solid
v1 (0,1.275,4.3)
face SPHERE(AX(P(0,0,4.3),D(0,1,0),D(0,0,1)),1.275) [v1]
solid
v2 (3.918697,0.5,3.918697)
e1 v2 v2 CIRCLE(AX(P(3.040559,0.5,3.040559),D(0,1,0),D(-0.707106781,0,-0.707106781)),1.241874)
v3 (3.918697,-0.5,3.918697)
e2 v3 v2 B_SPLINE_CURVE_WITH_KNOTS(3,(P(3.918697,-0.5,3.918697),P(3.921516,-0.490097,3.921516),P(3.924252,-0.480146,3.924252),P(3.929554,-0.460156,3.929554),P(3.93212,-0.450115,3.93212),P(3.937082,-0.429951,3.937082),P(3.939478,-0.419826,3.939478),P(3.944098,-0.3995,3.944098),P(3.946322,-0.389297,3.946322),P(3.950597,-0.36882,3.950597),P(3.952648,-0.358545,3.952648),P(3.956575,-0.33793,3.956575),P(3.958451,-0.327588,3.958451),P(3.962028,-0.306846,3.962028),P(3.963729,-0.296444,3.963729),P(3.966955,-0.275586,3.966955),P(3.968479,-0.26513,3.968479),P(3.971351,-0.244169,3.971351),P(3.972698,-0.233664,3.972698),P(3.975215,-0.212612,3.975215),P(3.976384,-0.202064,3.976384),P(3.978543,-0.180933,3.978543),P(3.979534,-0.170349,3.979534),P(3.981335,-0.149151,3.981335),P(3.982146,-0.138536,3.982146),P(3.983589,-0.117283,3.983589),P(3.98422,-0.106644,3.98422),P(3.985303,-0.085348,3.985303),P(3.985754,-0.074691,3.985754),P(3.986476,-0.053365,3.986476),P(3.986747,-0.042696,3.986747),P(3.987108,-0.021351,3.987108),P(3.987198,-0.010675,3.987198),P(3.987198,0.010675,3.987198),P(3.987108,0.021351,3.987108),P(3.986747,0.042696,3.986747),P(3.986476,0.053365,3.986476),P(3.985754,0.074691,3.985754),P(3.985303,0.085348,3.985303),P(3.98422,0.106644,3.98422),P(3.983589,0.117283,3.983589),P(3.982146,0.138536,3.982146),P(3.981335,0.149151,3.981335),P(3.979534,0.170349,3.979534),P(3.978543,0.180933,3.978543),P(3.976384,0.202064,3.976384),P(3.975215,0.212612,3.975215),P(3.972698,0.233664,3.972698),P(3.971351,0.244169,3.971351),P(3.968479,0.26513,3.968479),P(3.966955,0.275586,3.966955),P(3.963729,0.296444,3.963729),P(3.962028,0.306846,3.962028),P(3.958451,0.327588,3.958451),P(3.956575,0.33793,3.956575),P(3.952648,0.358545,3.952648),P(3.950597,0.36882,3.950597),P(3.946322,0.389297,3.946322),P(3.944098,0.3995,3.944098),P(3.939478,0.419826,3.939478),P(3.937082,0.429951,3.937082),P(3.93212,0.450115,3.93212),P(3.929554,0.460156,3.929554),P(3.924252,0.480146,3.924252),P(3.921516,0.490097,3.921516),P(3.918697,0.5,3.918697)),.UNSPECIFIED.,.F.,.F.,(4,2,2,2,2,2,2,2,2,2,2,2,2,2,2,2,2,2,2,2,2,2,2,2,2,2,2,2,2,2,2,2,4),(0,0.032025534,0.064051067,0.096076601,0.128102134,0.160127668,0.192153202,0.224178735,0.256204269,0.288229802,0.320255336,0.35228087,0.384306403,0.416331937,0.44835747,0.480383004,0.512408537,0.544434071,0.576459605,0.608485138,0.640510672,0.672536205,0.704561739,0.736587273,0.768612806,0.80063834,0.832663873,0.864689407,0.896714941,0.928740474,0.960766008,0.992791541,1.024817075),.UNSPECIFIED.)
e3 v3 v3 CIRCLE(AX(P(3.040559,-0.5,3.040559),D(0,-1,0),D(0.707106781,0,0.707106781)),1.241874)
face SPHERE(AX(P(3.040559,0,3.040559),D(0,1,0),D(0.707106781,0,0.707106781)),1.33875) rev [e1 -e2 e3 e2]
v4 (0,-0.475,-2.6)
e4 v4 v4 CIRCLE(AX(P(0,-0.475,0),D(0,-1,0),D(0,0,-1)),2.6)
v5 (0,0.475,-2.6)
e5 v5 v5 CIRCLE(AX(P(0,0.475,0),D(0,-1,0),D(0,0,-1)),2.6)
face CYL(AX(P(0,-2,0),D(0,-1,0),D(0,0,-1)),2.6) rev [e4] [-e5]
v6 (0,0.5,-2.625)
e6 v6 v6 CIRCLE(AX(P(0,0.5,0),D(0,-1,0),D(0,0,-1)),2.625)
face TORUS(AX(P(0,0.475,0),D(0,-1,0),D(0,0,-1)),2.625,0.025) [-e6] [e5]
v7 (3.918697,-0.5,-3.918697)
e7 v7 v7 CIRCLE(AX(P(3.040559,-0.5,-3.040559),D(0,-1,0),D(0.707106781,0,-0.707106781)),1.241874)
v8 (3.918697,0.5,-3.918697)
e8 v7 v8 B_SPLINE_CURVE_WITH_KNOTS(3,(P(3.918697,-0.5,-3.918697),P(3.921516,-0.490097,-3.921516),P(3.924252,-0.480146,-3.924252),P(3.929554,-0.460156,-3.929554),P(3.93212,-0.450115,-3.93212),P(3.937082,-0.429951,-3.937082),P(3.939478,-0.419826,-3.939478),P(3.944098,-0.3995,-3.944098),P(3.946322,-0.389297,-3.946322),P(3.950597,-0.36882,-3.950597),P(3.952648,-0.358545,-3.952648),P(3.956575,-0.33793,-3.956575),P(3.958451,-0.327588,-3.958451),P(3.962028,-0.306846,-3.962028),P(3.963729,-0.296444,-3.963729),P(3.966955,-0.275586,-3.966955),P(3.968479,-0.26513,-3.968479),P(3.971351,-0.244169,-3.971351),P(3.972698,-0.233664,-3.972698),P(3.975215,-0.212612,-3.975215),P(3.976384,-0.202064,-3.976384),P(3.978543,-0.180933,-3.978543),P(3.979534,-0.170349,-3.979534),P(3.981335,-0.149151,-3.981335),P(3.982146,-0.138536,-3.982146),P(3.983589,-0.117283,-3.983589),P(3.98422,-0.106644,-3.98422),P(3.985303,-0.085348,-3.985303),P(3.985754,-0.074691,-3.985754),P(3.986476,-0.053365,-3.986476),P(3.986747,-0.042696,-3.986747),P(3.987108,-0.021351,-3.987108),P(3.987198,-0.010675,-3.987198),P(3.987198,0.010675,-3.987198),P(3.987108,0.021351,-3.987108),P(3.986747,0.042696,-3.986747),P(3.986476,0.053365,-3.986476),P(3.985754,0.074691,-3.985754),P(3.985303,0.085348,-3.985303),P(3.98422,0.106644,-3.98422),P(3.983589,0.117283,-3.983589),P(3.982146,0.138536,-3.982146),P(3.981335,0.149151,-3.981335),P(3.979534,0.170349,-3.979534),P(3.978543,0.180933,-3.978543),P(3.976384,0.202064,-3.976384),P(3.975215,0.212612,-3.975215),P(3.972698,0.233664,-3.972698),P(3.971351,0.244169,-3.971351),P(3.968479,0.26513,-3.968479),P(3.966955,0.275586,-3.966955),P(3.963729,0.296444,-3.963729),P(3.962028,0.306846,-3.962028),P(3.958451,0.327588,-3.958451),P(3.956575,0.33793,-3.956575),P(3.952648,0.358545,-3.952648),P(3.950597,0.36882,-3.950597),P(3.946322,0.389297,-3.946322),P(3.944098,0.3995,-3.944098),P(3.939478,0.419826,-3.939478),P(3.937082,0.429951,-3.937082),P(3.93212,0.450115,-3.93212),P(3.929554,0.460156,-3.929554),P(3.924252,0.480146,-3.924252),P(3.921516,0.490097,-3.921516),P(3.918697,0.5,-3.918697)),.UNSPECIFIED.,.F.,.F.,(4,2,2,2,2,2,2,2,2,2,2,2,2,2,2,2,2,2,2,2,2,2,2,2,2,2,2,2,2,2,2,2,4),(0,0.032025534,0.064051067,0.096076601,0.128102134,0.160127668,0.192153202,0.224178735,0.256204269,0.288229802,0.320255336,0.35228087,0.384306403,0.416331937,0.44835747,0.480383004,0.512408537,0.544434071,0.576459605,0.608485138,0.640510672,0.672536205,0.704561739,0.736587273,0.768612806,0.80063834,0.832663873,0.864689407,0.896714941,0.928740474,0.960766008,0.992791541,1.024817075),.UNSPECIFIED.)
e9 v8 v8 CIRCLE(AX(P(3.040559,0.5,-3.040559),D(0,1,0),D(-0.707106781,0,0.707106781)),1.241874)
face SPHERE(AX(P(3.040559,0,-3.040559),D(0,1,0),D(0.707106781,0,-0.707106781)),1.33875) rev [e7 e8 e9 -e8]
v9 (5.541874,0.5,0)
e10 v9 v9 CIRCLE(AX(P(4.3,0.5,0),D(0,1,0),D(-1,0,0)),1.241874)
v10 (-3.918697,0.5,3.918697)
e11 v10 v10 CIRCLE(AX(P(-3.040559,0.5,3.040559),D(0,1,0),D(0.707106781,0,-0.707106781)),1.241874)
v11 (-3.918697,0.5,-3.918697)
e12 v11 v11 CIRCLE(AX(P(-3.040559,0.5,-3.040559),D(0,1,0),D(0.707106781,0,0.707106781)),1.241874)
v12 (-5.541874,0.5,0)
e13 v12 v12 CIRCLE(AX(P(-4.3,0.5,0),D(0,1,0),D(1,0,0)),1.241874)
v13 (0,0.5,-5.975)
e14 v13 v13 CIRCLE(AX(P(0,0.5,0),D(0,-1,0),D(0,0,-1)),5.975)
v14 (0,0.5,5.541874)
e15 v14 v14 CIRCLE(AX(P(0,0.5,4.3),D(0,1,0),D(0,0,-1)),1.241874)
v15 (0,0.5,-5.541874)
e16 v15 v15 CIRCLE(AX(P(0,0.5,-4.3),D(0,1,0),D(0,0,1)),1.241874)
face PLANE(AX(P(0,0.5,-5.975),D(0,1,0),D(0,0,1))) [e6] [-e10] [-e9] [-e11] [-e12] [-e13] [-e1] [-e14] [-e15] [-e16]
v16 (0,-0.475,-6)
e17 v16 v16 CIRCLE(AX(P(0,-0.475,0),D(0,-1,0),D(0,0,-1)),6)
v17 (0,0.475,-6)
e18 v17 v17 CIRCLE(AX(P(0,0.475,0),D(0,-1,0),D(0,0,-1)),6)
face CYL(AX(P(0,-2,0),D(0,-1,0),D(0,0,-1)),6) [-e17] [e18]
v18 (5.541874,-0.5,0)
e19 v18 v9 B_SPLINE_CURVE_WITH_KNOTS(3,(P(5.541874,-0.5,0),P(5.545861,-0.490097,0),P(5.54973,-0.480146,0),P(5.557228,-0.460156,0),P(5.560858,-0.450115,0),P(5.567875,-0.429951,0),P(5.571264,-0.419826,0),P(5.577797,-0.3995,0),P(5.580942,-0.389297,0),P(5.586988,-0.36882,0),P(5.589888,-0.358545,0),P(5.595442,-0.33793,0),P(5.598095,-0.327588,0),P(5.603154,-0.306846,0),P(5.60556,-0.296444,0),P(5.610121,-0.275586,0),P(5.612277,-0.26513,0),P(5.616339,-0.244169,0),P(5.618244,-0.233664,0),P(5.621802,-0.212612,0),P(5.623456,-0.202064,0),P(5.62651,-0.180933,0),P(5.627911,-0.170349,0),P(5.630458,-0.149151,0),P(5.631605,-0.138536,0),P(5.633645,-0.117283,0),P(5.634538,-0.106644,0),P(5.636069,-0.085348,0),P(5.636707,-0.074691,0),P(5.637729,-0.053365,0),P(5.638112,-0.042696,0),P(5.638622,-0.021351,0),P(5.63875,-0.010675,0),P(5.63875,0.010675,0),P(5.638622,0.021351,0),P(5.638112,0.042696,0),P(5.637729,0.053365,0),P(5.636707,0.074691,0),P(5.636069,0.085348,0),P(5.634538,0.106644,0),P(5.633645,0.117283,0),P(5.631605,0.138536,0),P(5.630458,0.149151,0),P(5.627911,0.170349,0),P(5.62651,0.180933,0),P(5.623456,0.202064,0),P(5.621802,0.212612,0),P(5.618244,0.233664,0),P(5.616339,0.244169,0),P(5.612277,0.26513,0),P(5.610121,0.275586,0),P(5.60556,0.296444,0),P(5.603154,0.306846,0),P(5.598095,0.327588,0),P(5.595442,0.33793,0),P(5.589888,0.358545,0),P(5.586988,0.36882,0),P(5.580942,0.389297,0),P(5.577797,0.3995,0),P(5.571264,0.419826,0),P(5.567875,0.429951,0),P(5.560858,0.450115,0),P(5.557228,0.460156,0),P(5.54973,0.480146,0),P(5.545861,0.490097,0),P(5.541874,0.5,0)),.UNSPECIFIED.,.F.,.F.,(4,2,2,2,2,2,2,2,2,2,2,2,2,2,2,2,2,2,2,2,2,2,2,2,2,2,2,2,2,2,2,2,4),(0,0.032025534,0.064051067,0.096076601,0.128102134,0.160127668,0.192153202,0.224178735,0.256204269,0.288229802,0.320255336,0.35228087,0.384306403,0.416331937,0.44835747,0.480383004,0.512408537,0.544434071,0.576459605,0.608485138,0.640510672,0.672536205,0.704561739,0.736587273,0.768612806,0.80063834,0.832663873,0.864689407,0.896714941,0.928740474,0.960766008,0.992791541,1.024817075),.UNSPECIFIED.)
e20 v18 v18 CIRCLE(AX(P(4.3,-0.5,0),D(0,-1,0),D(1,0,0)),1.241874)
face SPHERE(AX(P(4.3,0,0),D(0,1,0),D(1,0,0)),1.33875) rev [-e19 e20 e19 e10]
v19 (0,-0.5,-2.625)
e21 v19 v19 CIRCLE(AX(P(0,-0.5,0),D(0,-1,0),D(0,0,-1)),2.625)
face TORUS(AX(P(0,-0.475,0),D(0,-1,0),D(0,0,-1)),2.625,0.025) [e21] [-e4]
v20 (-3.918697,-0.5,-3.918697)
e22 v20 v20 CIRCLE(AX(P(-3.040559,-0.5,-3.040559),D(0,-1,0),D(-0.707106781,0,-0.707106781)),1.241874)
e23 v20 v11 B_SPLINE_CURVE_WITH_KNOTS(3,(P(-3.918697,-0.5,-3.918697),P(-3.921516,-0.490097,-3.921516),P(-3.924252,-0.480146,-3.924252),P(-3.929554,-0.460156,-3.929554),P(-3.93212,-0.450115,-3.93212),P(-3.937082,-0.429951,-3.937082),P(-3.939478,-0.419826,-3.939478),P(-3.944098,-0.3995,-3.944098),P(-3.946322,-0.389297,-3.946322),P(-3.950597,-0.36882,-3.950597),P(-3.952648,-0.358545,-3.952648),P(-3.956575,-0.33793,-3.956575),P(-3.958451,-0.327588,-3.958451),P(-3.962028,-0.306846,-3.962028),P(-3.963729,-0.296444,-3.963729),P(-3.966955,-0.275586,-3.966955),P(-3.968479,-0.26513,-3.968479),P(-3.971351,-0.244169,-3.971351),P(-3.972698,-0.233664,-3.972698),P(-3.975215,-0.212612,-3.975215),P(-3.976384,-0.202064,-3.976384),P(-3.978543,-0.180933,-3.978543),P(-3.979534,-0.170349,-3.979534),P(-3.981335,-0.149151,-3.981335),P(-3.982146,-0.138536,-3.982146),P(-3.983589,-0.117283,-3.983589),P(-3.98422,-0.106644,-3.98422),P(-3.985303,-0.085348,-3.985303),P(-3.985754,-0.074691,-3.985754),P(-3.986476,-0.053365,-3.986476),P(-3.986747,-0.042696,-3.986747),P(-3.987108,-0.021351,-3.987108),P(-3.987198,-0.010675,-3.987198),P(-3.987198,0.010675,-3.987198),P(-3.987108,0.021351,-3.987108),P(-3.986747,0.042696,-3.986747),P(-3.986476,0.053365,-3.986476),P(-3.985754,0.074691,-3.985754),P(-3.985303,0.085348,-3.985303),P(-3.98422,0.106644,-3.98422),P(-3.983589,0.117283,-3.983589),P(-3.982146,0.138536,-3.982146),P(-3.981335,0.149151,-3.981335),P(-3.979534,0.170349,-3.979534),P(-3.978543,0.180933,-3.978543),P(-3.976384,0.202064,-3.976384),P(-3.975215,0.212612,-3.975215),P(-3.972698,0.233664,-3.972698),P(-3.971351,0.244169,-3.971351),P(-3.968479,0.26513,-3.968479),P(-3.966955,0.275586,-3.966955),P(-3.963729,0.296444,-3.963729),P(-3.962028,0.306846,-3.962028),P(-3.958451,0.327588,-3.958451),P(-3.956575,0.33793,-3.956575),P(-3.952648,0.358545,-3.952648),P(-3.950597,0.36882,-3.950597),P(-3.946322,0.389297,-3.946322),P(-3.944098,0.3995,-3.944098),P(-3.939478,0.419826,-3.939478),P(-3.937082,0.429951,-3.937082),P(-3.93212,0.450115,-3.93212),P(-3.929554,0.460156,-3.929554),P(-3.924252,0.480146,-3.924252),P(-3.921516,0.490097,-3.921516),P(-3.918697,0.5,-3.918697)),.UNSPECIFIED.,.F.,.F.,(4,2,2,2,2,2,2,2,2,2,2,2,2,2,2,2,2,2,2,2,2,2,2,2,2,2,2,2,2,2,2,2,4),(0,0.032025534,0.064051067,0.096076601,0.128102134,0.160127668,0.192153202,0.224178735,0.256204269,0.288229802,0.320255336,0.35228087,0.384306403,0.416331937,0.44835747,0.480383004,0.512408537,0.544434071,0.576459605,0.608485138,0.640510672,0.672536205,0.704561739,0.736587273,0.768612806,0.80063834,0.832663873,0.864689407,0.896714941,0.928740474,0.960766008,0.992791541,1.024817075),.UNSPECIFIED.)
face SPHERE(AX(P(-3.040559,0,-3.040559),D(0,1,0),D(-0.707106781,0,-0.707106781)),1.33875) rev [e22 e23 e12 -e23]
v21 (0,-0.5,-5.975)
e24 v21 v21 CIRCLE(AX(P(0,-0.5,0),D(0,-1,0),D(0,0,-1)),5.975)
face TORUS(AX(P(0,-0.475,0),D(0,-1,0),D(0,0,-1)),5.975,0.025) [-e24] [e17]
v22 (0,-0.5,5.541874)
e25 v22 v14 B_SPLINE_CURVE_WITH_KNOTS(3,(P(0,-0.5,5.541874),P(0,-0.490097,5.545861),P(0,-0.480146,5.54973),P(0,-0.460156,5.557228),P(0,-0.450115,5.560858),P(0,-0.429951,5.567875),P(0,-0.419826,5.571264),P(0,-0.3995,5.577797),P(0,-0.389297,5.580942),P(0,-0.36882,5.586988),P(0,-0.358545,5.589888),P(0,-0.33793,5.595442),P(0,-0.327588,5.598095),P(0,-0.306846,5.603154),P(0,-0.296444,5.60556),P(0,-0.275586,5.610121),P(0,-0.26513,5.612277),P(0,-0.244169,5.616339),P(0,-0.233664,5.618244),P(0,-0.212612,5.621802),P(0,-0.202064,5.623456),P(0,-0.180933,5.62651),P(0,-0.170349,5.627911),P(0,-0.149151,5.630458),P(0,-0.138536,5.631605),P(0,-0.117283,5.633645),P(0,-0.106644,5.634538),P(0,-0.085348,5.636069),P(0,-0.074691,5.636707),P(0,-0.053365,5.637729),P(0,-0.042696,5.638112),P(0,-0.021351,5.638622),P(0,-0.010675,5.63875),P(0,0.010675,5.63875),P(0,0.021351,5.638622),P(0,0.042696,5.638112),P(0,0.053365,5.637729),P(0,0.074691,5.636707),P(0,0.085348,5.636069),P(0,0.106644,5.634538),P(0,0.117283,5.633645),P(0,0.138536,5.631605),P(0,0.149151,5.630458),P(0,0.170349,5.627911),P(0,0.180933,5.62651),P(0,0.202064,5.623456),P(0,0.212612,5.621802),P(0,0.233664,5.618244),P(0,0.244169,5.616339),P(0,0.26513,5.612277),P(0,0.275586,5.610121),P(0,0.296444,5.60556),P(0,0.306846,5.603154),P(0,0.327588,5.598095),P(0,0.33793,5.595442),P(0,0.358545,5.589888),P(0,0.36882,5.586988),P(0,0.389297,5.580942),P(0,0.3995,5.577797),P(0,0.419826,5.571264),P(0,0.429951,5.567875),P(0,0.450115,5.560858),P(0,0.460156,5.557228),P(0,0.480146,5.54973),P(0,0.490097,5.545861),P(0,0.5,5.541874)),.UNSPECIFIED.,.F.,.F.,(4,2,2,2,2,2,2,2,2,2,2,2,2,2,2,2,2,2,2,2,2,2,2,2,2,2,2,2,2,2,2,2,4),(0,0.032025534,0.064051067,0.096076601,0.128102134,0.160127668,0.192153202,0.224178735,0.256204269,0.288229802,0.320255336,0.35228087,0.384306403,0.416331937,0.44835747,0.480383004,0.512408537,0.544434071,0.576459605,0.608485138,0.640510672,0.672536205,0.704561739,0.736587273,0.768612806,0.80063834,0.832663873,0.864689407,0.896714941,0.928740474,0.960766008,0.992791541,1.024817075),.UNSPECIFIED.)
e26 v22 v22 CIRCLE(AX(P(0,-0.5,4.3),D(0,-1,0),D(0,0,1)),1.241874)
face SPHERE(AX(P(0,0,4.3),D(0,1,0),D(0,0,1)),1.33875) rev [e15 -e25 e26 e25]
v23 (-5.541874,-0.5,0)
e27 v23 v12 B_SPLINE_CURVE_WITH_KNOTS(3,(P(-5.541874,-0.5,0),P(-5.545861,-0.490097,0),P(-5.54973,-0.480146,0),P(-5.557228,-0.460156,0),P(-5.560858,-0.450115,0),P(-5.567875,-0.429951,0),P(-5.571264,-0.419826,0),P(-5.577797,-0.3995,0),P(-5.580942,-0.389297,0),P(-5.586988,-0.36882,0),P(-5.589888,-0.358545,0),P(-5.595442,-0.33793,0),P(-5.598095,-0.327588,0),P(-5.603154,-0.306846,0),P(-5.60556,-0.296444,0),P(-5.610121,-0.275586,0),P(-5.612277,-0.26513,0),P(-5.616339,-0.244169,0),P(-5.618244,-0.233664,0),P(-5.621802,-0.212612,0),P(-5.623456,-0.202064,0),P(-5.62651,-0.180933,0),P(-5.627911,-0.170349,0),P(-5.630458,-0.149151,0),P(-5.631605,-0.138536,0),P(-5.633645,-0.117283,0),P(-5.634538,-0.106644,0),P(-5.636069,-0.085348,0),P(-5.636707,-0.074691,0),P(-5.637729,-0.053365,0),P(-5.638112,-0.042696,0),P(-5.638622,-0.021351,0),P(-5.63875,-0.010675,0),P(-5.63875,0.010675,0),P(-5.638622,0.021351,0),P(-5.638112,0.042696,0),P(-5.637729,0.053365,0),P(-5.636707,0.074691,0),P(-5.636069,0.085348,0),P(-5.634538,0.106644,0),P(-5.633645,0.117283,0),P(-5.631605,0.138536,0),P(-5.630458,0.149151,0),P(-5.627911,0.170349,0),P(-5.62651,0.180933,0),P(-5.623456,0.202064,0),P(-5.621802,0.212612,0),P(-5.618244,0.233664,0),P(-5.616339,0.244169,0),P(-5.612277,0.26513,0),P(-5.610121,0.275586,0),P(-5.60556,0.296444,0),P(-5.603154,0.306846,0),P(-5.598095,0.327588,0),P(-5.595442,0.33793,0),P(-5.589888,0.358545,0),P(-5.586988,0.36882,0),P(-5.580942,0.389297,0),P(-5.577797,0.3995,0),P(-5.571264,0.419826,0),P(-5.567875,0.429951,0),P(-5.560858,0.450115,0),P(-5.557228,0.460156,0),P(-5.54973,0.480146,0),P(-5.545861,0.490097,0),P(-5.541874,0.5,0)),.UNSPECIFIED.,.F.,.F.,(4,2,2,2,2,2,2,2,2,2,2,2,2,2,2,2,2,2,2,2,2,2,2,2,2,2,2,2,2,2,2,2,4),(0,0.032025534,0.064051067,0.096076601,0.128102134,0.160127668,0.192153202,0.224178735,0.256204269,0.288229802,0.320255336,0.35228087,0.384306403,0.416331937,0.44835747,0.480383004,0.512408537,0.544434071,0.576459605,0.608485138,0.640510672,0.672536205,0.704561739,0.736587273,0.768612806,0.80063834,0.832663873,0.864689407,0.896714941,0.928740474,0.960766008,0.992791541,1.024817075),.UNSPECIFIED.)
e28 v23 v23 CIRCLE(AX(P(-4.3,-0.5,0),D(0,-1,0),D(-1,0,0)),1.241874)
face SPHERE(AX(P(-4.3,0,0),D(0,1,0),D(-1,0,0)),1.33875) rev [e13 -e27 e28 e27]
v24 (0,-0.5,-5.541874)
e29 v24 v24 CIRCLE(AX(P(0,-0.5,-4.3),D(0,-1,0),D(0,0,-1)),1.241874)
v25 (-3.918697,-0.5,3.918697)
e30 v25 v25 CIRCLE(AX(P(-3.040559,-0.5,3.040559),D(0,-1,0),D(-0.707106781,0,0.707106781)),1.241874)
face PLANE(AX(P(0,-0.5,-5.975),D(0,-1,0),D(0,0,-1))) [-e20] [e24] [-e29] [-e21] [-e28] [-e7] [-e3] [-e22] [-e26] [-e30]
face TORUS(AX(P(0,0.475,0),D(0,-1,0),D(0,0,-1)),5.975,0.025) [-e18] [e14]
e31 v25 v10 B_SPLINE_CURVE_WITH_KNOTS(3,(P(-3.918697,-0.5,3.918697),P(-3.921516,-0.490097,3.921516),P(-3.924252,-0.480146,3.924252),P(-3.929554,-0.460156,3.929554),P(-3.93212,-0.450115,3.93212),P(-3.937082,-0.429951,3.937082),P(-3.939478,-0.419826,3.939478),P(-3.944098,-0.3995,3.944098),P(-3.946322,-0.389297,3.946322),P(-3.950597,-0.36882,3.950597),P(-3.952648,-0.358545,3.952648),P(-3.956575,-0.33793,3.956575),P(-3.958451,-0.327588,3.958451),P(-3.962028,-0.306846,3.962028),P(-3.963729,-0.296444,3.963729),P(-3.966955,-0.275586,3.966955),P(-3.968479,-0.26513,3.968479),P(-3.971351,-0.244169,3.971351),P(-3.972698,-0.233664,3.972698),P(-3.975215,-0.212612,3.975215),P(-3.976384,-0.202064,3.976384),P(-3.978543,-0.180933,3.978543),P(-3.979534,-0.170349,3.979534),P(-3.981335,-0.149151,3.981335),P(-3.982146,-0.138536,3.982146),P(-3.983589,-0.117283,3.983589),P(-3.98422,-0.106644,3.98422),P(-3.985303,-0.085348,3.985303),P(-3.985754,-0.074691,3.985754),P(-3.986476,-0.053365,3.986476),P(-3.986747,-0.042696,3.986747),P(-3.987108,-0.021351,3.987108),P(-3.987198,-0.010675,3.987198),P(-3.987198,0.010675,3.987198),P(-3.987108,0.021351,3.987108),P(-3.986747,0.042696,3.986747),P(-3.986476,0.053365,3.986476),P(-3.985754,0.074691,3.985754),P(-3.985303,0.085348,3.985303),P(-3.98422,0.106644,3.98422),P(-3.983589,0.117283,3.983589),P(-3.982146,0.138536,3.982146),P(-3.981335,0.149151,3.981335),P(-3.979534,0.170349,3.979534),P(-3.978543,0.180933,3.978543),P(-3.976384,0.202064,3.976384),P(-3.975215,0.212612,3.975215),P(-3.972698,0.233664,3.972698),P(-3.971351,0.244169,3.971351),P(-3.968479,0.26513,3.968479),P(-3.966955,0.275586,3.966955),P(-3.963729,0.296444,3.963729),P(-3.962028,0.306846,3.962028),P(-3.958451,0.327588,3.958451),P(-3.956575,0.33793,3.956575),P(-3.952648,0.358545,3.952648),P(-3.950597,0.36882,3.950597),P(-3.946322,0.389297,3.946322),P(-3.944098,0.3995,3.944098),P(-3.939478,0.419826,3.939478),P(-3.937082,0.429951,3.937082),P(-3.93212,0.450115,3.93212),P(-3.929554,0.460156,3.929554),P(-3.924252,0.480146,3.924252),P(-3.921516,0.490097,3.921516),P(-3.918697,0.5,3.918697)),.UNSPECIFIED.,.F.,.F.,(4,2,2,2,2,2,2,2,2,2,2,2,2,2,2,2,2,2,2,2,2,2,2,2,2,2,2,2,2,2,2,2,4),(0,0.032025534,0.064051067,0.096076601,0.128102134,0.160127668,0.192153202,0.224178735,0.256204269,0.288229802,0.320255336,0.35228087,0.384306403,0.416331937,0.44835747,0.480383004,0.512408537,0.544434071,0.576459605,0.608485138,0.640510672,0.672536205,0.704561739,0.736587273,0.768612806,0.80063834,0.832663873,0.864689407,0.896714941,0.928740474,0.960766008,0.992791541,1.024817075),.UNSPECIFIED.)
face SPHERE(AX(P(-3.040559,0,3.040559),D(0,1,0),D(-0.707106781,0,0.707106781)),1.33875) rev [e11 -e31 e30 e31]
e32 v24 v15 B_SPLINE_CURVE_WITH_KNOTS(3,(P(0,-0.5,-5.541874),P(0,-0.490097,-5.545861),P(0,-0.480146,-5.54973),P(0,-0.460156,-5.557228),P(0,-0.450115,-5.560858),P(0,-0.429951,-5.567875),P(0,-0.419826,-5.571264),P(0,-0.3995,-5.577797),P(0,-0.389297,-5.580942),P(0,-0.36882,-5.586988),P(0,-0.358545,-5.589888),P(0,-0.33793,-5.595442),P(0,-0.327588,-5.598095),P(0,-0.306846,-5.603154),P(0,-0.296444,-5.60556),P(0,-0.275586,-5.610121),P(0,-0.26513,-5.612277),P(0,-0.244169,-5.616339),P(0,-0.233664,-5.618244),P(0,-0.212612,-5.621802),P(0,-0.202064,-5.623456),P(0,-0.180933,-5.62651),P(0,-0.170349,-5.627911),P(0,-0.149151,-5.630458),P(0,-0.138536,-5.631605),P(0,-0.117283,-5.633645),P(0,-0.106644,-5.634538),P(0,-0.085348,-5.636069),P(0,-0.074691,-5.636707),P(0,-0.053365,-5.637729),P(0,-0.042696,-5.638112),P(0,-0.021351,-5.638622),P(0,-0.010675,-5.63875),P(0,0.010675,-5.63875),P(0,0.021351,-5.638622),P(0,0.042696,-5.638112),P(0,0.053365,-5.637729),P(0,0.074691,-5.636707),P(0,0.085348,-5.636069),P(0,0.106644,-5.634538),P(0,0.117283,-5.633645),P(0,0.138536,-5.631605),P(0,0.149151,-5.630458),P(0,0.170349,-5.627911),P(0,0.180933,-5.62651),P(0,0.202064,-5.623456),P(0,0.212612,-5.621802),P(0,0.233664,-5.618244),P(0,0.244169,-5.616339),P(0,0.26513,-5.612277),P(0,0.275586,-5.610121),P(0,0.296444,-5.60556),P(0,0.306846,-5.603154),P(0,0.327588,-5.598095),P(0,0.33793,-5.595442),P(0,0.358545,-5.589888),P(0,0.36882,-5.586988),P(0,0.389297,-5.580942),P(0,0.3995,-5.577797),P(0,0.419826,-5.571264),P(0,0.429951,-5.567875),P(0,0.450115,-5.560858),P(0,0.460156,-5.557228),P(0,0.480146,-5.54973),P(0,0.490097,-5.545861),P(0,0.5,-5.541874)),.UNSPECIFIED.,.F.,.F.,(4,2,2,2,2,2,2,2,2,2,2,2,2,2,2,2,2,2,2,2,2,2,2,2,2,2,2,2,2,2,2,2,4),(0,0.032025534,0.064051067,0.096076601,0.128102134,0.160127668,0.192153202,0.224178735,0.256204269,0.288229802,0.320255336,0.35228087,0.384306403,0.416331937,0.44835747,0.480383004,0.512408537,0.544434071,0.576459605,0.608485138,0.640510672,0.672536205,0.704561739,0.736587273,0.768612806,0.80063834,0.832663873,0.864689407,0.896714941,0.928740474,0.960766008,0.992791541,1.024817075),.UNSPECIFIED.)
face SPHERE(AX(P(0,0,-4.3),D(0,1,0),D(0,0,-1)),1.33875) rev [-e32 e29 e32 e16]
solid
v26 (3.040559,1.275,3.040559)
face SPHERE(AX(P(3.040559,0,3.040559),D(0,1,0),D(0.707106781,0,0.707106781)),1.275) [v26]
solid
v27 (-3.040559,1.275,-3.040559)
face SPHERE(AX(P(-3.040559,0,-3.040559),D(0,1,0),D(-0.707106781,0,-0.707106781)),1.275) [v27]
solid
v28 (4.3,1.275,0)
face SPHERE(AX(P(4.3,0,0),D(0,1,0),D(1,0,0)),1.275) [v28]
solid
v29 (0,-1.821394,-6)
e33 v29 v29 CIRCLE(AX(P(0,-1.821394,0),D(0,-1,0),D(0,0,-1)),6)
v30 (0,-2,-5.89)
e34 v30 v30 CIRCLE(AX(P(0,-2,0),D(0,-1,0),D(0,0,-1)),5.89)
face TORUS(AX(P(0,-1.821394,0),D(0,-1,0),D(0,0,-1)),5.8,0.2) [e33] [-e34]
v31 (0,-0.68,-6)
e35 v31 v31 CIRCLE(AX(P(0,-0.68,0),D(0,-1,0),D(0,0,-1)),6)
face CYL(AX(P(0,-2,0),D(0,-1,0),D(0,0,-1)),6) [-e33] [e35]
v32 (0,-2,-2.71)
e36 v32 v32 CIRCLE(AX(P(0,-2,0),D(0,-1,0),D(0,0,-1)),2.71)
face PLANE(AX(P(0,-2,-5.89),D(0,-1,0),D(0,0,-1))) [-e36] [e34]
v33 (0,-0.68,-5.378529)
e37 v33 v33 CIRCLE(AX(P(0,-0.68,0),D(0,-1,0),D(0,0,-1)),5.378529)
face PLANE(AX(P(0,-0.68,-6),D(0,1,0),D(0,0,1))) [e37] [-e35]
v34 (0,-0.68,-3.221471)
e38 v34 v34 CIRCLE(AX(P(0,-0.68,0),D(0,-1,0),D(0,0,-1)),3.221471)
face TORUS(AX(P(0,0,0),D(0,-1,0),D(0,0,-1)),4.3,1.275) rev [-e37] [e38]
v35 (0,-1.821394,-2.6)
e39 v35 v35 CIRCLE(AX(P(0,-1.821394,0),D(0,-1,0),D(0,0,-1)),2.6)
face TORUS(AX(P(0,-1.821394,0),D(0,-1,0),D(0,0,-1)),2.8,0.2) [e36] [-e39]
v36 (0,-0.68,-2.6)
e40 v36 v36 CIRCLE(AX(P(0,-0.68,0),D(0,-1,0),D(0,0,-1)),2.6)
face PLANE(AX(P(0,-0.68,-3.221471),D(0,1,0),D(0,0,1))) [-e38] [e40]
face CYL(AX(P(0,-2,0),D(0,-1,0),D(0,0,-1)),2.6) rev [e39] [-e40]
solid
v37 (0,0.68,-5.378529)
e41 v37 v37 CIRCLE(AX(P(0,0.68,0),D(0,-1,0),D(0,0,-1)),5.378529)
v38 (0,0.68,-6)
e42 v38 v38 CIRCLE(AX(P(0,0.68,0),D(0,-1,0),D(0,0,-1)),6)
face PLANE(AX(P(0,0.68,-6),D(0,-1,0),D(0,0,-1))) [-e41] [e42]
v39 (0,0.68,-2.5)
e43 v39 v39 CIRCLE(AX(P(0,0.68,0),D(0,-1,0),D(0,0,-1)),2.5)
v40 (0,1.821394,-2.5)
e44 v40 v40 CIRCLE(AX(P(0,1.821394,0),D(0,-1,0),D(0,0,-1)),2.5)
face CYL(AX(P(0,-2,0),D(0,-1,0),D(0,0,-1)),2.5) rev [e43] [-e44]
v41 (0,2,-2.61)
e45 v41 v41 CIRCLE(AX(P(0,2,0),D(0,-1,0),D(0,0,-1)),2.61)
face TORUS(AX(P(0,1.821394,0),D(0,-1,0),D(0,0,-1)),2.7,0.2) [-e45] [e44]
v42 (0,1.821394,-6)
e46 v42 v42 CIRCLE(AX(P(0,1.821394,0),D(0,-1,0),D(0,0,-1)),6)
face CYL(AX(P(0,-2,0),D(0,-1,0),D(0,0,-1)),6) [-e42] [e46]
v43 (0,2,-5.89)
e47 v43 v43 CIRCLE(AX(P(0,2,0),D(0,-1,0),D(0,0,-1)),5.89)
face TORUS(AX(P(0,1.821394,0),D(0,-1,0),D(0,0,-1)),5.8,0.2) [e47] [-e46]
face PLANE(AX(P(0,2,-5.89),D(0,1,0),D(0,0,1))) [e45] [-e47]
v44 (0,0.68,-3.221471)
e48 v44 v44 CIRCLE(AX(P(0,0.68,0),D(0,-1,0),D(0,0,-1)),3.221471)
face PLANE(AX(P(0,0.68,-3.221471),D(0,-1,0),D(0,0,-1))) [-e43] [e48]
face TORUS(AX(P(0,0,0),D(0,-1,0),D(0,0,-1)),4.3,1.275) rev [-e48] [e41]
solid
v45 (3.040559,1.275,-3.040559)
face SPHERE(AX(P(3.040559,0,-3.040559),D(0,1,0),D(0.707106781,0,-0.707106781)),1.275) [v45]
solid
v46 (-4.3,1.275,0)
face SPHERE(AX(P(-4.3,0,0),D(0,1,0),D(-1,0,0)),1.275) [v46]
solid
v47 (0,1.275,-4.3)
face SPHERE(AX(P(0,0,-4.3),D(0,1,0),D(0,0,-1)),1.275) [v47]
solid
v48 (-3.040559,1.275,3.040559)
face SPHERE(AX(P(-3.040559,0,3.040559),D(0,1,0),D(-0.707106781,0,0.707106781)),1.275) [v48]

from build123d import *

# Parameters (mm, degrees)
CIRPATTERN1_COUNT = 8
CIRPATTERN2_COUNT = 8


# Read off the part's stored shape, not the designer's step: Cut-Revolve1
with BuildPart() as part:
    # Sketch3 → Revolve1 (revolve)
    with BuildSketch(Plane(origin=(0, 0, 0), x_dir=(0, 0, -1), z_dir=(1, 0, 0))):
        with BuildLine():
            Line((6, 0.68), (5.378529091, 0.68))
            ThreePointArc((5.378529091, 0.68), (4.3, 1.275), (3.221470909, 0.68))
            Line((3.221470909, 0.68), (2.5, 0.68))
            Line((2.5, 0.68), (2.5, 1.821394289))
            ThreePointArc((2.5, 1.821394289), (2.529706136, 1.926275174), (2.61, 2))
            Line((2.61, 2), (5.89, 2))
            ThreePointArc((5.89, 2), (5.970293864, 1.926275174), (6, 1.821394289))
            Line((6, 1.821394289), (6, 0.68))
        make_face()
        with BuildLine():
            Line((3.221470909, -0.68), (2.6, -0.68))
            Line((2.6, -0.68), (2.6, -1.821394289))
            ThreePointArc((2.6, -1.821394289), (2.629706136, -1.926275174), (2.71, -2))
            Line((2.71, -2), (5.89, -2))
            ThreePointArc((5.89, -2), (5.970293864, -1.926275174), (6, -1.821394289))
            Line((6, -1.821394289), (6, -0.68))
            Line((6, -0.68), (5.378529091, -0.68))
            ThreePointArc((5.378529091, -0.68), (4.3, -1.275), (3.221470909, -0.68))
        make_face()
        with BuildLine():
            Line((5.975, 0.5), (2.625, 0.5))
            ThreePointArc((2.625, 0.5), (2.60732233, 0.49267767), (2.6, 0.475))
            Line((2.6, 0.475), (2.6, -0.475))
            ThreePointArc((2.6, -0.475), (2.60732233, -0.49267767), (2.625, -0.5))
            Line((2.625, -0.5), (5.975, -0.5))
            ThreePointArc((5.975, -0.5), (5.99267767, -0.49267767), (6, -0.475))
            Line((6, -0.475), (6, 0.475))
            ThreePointArc((6, 0.475), (5.99267767, 0.49267767), (5.975, 0.5))
        make_face()
    revolve(axis=Axis((0, -2, 0), (0, 1, 0)))

    # Cut-Revolve1 outline → Cut-Revolve1 (revolve, cut)
    with BuildSketch(Plane.XY.offset(-4.3)):
        with BuildLine():
            Line((1.241874213, 0.500000001), (0, 0.500000001))
            Line((0, 0.500000001), (0, -0.500000001))
            Line((0, -0.500000001), (1.241874213, -0.500000001))
            ThreePointArc((1.241874213, -0.500000001), (1.33875, 0), (1.241874213, 0.500000001))
        make_face()
    cut_revolve1 = revolve(axis=Axis((0, 0, -4.3), (0, 1, 0)), mode=Mode.SUBTRACT)

    # CirPattern2: Cut-Revolve1 ×8 about axis
    cirpattern2_axis = Axis((0, 0, 0), (0, 1, 0))
    for i in range(1, CIRPATTERN2_COUNT):
        add(cut_revolve1.rotate(cirpattern2_axis, i * 360 / CIRPATTERN2_COUNT), mode=Mode.SUBTRACT)


with BuildPart() as body_2:
    # Sketch4 → Revolve2 (revolve)
    with BuildSketch(Plane(origin=(0, 0, 0), x_dir=(0, 0, -1), z_dir=(1, 0, 0))):
        with BuildLine():
            Line((4.3, -1.275), (4.3, 1.275))
            ThreePointArc((4.3, 1.275), (3.025, 0), (4.3, -1.275))
        make_face()
    revolve(axis=Axis((0, 2, -4.3), (0, -1, 0)))


with BuildPart() as cirpattern1_1:
    # CirPattern1: pattern copy
    add(body_2.part.rotate(Axis((0, 0, 0), (0, 1, 0)), 1 * 360 / CIRPATTERN1_COUNT))


with BuildPart() as cirpattern1_2:
    # CirPattern1: pattern copy
    add(body_2.part.rotate(Axis((0, 0, 0), (0, 1, 0)), 2 * 360 / CIRPATTERN1_COUNT))


with BuildPart() as cirpattern1_3:
    # CirPattern1: pattern copy
    add(body_2.part.rotate(Axis((0, 0, 0), (0, 1, 0)), 3 * 360 / CIRPATTERN1_COUNT))


with BuildPart() as cirpattern1_4:
    # CirPattern1: pattern copy
    add(body_2.part.rotate(Axis((0, 0, 0), (0, 1, 0)), 4 * 360 / CIRPATTERN1_COUNT))


with BuildPart() as cirpattern1_5:
    # CirPattern1: pattern copy
    add(body_2.part.rotate(Axis((0, 0, 0), (0, 1, 0)), 5 * 360 / CIRPATTERN1_COUNT))


with BuildPart() as cirpattern1_6:
    # CirPattern1: pattern copy
    add(body_2.part.rotate(Axis((0, 0, 0), (0, 1, 0)), 6 * 360 / CIRPATTERN1_COUNT))


with BuildPart() as cirpattern1_7:
    # CirPattern1: pattern copy
    add(body_2.part.rotate(Axis((0, 0, 0), (0, 1, 0)), 7 * 360 / CIRPATTERN1_COUNT))


solid = Compound([part.part, body_2.part, cirpattern1_1.part, cirpattern1_2.part, cirpattern1_3.part, cirpattern1_4.part, cirpattern1_5.part, cirpattern1_6.part, cirpattern1_7.part])
